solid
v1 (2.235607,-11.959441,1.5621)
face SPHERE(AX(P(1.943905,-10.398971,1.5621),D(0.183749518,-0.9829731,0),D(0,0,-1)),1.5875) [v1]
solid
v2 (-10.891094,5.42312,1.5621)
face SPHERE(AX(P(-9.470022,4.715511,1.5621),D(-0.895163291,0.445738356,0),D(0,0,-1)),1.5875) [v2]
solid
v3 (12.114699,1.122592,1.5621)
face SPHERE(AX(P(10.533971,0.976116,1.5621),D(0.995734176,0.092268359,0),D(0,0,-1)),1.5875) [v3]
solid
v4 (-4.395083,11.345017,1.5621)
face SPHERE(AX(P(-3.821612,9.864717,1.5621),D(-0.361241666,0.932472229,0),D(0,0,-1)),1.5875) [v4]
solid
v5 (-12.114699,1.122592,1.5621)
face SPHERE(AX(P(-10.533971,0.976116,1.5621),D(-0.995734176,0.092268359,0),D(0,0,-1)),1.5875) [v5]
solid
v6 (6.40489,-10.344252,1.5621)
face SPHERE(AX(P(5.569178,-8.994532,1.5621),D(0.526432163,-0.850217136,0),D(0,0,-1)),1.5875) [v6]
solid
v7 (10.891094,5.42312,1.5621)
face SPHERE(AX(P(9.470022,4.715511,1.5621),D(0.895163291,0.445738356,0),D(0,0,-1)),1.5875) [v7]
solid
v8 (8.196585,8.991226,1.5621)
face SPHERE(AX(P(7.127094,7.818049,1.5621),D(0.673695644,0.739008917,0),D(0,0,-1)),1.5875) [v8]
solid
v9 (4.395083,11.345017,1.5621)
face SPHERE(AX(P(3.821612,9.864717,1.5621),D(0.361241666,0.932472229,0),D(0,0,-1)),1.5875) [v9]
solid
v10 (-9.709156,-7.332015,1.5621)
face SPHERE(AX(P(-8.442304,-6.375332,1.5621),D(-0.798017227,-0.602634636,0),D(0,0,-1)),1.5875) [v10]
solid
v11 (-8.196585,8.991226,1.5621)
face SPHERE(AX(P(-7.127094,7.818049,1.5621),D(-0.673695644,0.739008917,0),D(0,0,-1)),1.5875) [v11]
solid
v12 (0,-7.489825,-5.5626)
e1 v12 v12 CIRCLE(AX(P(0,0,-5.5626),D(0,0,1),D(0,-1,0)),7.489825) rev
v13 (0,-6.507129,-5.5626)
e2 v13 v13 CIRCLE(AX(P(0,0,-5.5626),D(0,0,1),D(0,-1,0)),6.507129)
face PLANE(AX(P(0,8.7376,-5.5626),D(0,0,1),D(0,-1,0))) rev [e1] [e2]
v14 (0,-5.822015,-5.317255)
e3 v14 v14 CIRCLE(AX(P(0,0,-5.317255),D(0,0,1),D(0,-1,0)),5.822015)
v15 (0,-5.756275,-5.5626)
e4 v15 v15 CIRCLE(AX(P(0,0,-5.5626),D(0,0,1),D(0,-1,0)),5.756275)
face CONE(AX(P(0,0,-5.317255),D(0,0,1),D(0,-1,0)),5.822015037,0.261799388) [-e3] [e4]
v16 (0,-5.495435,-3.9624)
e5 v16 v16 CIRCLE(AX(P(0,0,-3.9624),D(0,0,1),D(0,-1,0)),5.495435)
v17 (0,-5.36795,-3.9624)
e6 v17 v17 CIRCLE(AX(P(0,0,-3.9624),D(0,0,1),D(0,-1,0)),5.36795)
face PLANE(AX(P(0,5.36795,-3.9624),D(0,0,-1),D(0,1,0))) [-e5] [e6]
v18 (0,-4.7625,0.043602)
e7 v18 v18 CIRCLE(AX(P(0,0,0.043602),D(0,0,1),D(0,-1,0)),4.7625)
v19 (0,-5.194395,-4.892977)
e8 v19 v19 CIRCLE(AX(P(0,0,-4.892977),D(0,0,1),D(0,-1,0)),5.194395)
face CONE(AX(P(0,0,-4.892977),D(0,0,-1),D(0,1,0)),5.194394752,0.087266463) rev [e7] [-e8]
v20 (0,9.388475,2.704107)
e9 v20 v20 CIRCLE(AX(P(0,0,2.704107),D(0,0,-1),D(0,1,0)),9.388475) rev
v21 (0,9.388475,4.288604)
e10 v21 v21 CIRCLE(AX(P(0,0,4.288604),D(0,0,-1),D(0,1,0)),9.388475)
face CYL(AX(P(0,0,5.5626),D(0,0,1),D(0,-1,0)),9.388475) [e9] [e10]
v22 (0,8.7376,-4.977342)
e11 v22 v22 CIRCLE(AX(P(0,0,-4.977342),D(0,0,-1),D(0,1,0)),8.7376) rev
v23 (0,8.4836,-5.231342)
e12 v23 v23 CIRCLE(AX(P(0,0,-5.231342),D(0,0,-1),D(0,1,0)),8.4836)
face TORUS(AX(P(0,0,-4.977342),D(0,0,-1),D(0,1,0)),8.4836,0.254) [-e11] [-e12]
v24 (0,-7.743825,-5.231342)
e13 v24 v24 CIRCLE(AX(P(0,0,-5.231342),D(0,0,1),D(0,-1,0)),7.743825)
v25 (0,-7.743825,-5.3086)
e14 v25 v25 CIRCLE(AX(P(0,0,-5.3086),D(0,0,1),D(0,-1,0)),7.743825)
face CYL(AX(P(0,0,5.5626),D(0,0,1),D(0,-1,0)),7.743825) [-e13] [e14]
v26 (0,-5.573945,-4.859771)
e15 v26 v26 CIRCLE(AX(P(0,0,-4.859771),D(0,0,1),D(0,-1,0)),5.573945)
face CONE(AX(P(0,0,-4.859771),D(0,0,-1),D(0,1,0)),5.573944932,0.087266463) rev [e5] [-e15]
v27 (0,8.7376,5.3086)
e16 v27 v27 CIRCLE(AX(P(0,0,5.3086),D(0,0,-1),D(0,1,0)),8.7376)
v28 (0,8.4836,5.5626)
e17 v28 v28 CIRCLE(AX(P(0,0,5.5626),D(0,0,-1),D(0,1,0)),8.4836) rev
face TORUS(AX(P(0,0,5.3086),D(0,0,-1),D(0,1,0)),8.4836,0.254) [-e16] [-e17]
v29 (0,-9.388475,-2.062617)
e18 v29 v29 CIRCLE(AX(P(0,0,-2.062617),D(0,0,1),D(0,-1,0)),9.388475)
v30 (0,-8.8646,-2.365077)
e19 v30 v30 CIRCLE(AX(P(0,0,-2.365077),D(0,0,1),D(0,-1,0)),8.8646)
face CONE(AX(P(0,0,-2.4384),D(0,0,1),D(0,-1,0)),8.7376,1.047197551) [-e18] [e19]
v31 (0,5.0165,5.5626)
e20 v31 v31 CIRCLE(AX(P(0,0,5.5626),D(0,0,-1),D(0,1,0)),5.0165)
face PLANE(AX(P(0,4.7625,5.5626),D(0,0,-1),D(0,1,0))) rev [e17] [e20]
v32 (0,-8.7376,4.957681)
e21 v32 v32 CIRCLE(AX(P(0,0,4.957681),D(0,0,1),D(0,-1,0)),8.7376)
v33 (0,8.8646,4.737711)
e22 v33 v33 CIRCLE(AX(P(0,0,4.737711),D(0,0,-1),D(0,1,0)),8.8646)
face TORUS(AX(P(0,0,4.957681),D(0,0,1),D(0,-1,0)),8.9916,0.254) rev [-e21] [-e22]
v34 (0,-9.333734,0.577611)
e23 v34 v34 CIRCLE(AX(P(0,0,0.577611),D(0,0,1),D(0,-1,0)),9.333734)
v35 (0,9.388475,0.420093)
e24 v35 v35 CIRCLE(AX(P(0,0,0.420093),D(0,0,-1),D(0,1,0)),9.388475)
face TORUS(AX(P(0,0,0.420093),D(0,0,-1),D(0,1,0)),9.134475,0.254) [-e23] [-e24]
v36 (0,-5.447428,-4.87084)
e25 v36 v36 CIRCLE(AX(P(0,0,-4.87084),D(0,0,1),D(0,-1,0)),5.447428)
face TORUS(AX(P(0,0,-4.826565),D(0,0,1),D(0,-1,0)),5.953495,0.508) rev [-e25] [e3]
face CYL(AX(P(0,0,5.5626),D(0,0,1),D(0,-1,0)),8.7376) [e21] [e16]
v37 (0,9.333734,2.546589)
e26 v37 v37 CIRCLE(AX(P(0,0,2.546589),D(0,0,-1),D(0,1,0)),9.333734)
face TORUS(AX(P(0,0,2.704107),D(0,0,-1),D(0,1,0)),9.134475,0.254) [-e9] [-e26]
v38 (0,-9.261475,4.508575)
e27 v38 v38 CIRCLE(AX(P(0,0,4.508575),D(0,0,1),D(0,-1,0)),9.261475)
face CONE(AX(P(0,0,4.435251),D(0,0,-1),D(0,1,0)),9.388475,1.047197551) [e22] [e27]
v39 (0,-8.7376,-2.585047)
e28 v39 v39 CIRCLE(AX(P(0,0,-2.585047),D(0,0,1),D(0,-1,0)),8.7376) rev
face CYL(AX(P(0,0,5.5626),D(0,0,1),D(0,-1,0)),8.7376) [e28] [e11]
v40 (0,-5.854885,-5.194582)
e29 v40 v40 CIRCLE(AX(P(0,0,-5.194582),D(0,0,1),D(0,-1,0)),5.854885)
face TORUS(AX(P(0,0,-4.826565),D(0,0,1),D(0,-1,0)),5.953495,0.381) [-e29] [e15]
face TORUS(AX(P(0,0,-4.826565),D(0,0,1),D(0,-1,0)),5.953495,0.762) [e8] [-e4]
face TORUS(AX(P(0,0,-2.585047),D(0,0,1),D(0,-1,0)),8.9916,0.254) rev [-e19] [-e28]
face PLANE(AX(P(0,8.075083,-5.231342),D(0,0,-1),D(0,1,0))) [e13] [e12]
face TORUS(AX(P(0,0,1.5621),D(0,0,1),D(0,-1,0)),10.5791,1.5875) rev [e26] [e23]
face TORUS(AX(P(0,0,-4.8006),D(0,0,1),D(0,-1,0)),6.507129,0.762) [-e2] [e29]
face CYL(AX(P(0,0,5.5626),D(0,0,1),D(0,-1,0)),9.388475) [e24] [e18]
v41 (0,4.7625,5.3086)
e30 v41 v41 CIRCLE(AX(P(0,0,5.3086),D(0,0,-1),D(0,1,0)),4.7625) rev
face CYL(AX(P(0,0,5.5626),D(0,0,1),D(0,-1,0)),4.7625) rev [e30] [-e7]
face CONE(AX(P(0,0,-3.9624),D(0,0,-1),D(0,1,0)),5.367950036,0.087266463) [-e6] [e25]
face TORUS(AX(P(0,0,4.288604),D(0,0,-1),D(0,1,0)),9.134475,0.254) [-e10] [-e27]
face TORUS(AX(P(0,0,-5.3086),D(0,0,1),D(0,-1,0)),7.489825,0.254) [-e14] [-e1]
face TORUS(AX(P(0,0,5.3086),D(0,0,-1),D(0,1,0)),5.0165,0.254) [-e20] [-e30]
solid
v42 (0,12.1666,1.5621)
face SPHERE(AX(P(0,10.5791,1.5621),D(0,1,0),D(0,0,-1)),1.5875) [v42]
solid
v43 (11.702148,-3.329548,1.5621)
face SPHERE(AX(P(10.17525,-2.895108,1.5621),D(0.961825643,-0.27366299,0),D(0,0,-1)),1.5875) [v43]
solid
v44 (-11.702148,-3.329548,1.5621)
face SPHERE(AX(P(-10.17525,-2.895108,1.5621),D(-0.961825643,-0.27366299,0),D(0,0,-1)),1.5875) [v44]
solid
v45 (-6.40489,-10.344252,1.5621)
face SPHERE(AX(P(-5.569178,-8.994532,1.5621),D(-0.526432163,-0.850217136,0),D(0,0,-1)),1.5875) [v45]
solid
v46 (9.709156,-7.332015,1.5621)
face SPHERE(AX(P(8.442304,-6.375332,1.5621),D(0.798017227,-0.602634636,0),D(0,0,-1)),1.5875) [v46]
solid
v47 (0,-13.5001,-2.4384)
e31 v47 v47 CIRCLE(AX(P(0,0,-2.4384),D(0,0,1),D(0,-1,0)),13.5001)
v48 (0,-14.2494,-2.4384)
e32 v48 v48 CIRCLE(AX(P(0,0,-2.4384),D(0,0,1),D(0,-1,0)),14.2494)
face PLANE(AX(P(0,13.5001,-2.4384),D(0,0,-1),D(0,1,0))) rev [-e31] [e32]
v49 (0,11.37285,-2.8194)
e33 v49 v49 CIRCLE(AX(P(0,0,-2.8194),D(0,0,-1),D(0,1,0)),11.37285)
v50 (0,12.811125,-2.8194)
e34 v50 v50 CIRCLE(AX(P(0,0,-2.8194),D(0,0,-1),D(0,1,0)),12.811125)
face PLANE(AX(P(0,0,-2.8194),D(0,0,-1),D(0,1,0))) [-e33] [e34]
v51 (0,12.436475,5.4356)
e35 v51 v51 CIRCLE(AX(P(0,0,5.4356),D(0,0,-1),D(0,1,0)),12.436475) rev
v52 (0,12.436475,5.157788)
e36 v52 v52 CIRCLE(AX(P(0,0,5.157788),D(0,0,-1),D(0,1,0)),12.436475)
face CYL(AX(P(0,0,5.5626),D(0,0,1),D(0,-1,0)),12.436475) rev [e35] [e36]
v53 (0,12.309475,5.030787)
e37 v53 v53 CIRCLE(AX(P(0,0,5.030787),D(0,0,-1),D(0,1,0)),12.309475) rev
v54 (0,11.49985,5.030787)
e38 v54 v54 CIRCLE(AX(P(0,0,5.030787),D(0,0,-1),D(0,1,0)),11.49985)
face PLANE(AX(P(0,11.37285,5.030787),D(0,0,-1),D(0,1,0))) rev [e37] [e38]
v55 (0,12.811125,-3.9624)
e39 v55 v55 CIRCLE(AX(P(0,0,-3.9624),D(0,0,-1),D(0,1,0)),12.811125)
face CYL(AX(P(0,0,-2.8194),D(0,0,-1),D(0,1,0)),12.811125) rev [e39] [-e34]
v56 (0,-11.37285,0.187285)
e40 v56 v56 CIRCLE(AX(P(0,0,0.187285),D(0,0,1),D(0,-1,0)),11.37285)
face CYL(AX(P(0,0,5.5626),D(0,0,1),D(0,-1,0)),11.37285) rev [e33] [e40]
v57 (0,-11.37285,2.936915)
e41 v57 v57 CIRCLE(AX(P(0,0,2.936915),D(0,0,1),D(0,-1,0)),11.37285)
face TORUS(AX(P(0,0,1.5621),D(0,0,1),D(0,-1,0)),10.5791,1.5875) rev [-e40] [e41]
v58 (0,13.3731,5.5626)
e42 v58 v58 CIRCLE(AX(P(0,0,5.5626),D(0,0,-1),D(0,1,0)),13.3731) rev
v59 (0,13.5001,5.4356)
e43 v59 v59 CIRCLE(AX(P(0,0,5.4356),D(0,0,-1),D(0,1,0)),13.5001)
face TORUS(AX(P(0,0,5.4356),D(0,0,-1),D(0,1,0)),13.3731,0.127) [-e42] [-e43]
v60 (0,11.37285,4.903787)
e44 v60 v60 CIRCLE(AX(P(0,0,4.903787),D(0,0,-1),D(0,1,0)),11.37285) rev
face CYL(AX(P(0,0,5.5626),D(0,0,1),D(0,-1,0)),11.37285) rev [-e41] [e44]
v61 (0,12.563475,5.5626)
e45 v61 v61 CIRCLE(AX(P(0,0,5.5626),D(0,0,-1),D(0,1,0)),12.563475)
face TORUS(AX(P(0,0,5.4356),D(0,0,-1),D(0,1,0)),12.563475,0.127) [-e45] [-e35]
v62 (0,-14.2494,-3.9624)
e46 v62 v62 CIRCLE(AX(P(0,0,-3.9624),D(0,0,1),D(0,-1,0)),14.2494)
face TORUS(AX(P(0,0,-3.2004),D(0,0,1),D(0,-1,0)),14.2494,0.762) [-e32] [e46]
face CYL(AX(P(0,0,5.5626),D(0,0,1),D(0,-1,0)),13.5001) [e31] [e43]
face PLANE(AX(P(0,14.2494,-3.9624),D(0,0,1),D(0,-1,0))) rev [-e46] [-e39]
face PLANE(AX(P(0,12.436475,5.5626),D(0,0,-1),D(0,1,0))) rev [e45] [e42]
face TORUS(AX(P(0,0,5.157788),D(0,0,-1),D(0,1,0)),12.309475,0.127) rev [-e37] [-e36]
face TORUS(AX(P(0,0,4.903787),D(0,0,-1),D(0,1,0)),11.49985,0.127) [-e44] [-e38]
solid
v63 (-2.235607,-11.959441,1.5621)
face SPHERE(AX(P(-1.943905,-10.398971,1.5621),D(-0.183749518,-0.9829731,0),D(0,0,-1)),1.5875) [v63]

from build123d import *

# Parameters (mm, degrees)
FILLET4_R          = 0.762
CIRPATTERN3_COUNT  = 17
FILLET2_R          = 0.127
FILLET3_R          = 0.127
FILLET5_R          = 0.254
SKETCH12_R         = 12.811125
SKETCH12_R_2       = 11.37285
CUT_EXTRUDE1_DEPTH = 1.143


with BuildPart() as part:
    # Sketch2 → Revolve1 (revolve)
    with BuildSketch(Plane(origin=(0, 0, 0), x_dir=(0, 0, -1), z_dir=(1, 0, 0)), mode=Mode.PRIVATE) as revolve1_sk:
        with BuildLine():
            Line((2.4384, 13.5001), (-5.5626, 13.5001))
            Line((-5.5626, 13.5001), (-5.5626, 12.436475))
            Line((-5.5626, 12.436475), (-5.0307875, 12.436475))
            Line((-5.0307875, 12.436475), (-5.0307875, 11.37285))
            Line((-5.0307875, 11.37285), (-2.936915329, 11.37285))
            ThreePointArc((-2.936915329, 11.37285), (-1.5621, 12.1666), (-0.187284671, 11.37285))
            Line((-0.187284671, 11.37285), (3.9624, 11.37285))
            Line((3.9624, 11.37285), (3.9624, 14.2494))
            ThreePointArc((3.9624, 14.2494), (3.2004, 15.0114), (2.4384, 14.2494))
            Line((2.4384, 14.2494), (2.4384, 13.5001))
        make_face()
    revolve(revolve1_sk.sketch.rotate(Axis((0, 0, 5.5626), (0, 0, -1)), 180), axis=Axis((0, 0, 5.5626), (0, 0, -1)))

    # Fillet2
    fillet2_edges = [part.edges().sort_by_distance(p)[0] for p in [
        (0, 11.37285, 5.0307875),
        (0, 12.436475, 5.0307875),
    ]]
    fillet(fillet2_edges, radius=FILLET2_R)

    # Fillet3
    fillet3_edges = [part.edges().sort_by_distance(p)[0] for p in [
        (0, 12.436475, 5.5626),
        (0, 13.5001, 5.5626),
    ]]
    fillet(fillet3_edges, radius=FILLET3_R)

    # Sketch12 → Cut-Extrude1 (cut)
    with BuildSketch(Plane(origin=(0, 0, -3.9624), x_dir=(-1, 0, 0), z_dir=(0, 0, -1))):
        with Locations(Location((0, 0, 0), (0, 0, 90))):
            Circle(SKETCH12_R)
        with Locations(Location((0, 0, 0), (0, 0, 270))):
            Circle(SKETCH12_R_2, mode=Mode.SUBTRACT)
    extrude(amount=-CUT_EXTRUDE1_DEPTH, mode=Mode.SUBTRACT)


with BuildPart() as body_2:
    # Sketch3 → Revolve2 (revolve)
    with BuildSketch(Plane(origin=(0, 0, 0), x_dir=(0, 0, -1), z_dir=(1, 0, 0)), mode=Mode.PRIVATE) as revolve2_sk:
        with BuildLine():
            Line((-5.5626, 8.7376), (-4.811034287, 8.7376))
            Line((-4.811034287, 8.7376), (-4.435251431, 9.388475))
            Line((-4.435251431, 9.388475), (-2.612132552, 9.388475))
            ThreePointArc((-2.612132552, 9.388475), (-1.5621, 8.9916), (-0.512067448, 9.388475))
            Line((-0.512067448, 9.388475), (2.062617144, 9.388475))
            Line((2.062617144, 9.388475), (2.4384, 8.7376))
            Line((2.4384, 8.7376), (5.5626, 8.7376))
            Line((5.5626, 8.7376), (5.5626, 4.7625))
            Line((5.5626, 4.7625), (-5.5626, 4.7625))
            Line((-5.5626, 4.7625), (-5.5626, 8.7376))
        make_face()
    revolve(revolve2_sk.sketch.rotate(Axis((0, 0, 5.5626), (0, 0, -1)), 180), axis=Axis((0, 0, 5.5626), (0, 0, -1)))

    # Sketch5 → Cut-Revolve2 (revolve, cut)
    with BuildSketch(Plane(origin=(0, 0, 0), x_dir=(0, 0, -1), z_dir=(1, 0, 0)), mode=Mode.PRIVATE) as cut_revolve2_sk:
        with BuildLine():
            Line((5.5626, 5.756275), (5.5626, 4.7625))
            Line((5.5626, 4.7625), (-0.043602413, 4.7625))
            Line((-0.043602413, 4.7625), (4.892977196, 5.194394752))
            ThreePointArc((4.892977196, 5.194394752), (5.316368679, 5.369769247), (5.5626, 5.756275))
        make_face()
    revolve(cut_revolve2_sk.sketch.rotate(Axis((0, 0, 5.5626), (0, 0, -1)), 180), axis=Axis((0, 0, 5.5626), (0, 0, -1)), mode=Mode.SUBTRACT)

    # Sketch6 → Cut-Revolve3 (revolve, cut)
    with BuildSketch(Plane(origin=(0, 0, 0), x_dir=(0, 0, -1), z_dir=(1, 0, 0)), mode=Mode.PRIVATE) as cut_revolve3_sk:
        with BuildLine():
            Line((5.31725484, 5.822015037), (5.5626, 5.756275))
            Line((5.5626, 5.756275), (5.5626, 5.854885056))
            Line((5.5626, 5.854885056), (5.19458226, 5.854885056))
            ThreePointArc((5.19458226, 5.854885056), (5.0714666, 5.66163218), (4.859770858, 5.573944932))
            Line((4.859770858, 5.573944932), (3.9624, 5.495435155))
            Line((3.9624, 5.495435155), (3.9624, 5.367950036))
            Line((3.9624, 5.367950036), (4.870839638, 5.447428206))
            ThreePointArc((4.870839638, 5.447428206), (5.153100626, 5.564344535), (5.31725484, 5.822015037))
        make_face()
    revolve(cut_revolve3_sk.sketch.rotate(Axis((0, 0, 5.5626), (0, 0, -1)), 180), axis=Axis((0, 0, 5.5626), (0, 0, -1)), mode=Mode.SUBTRACT)

    # Fillet4
    # the kernel refuses this fillet: 0.762 mm, written as the material it takes off along each edge
    with BuildSketch(Plane(origin=(0, 0, -5.5626), x_dir=(0, -1, 0), z_dir=(1, 0, 0))) as fillet4_piece_1:
        with BuildLine():
            CenterArc((6.507128859, -0.762), FILLET4_R, 90, 58.866285833)
            Line((5.854885056, -0.36801774), (5.84184018, -0.360138095))
            ThreePointArc((5.84184018, -0.360138095), (5.839645056, -0.18400887), (5.839645056, 0))
            Line((5.839645056, 0), (5.854885056, 0.01524))
            Line((5.854885056, 0.01524), (6.507128859, 0.01524))
            Line((6.507128859, 0.01524), (6.507128859, 0))
        make_face()
    revolve(axis=Axis((0, 0, -5.5626), (0, 0, -1)), mode=Mode.SUBTRACT)

    # Sketch7 → Cut-Revolve4 (revolve, cut)
    with BuildSketch(Plane(origin=(0, 0, 0), x_dir=(0, 0, -1), z_dir=(1, 0, 0)), mode=Mode.PRIVATE) as cut_revolve4_sk:
        Polygon((5.5626, 7.743825), (5.5626, 8.7376), (5.231341667, 8.7376), (5.231341667, 8.406341667), (5.231341667, 8.075083333), (5.231341667, 7.743825), align=None)
    revolve(cut_revolve4_sk.sketch.rotate(Axis((0, 0, 5.5626), (0, 0, -1)), 180), axis=Axis((0, 0, 5.5626), (0, 0, -1)), mode=Mode.SUBTRACT)

    # Fillet5
    fillet5_edges = [body_2.edges().sort_by_distance(p)[0] for p in [
        (0, 4.7625, 5.5626),
        (0, 7.743825, -5.5626),
        (0, 8.7376, -5.231341667),
        (0, 8.7376, 5.5626),
        (0, 8.7376, 4.811034287),
        (0, 9.388475, 4.435251431),
        (0, 9.388475, 2.612132552),
        (0, 9.388475, 0.512067448),
        (0, 8.7376, -2.4384),
    ]]
    fillet(fillet5_edges, radius=FILLET5_R)


with BuildPart() as body_3:
    # Sketch11 → Revolve3 (revolve)
    with BuildSketch(Plane(origin=(0, 0, 0), x_dir=(0, 0, -1), z_dir=(1, 0, 0))):
        with BuildLine():
            Line((-1.5621, 12.1666), (-1.5621, 8.9916))
            ThreePointArc((-1.5621, 8.9916), (0.0254, 10.5791), (-1.5621, 12.1666))
        make_face()
    revolve(axis=Axis((0, 12.1666, 1.5621), (0, -1, 0)))


with BuildPart() as cirpattern3_1:
    # CirPattern3: pattern copy
    add(body_3.part.rotate(Axis((0, 0, 0), (0, 0, 1)), 1 * 360 / CIRPATTERN3_COUNT))


with BuildPart() as cirpattern3_2:
    # CirPattern3: pattern copy
    add(body_3.part.rotate(Axis((0, 0, 0), (0, 0, 1)), 2 * 360 / CIRPATTERN3_COUNT))


with BuildPart() as cirpattern3_3:
    # CirPattern3: pattern copy
    add(body_3.part.rotate(Axis((0, 0, 0), (0, 0, 1)), 3 * 360 / CIRPATTERN3_COUNT))


with BuildPart() as cirpattern3_4:
    # CirPattern3: pattern copy
    add(body_3.part.rotate(Axis((0, 0, 0), (0, 0, 1)), 4 * 360 / CIRPATTERN3_COUNT))


with BuildPart() as cirpattern3_5:
    # CirPattern3: pattern copy
    add(body_3.part.rotate(Axis((0, 0, 0), (0, 0, 1)), 5 * 360 / CIRPATTERN3_COUNT))


with BuildPart() as cirpattern3_6:
    # CirPattern3: pattern copy
    add(body_3.part.rotate(Axis((0, 0, 0), (0, 0, 1)), 6 * 360 / CIRPATTERN3_COUNT))


with BuildPart() as cirpattern3_7:
    # CirPattern3: pattern copy
    add(body_3.part.rotate(Axis((0, 0, 0), (0, 0, 1)), 7 * 360 / CIRPATTERN3_COUNT))


with BuildPart() as cirpattern3_8:
    # CirPattern3: pattern copy
    add(body_3.part.rotate(Axis((0, 0, 0), (0, 0, 1)), 8 * 360 / CIRPATTERN3_COUNT))


with BuildPart() as cirpattern3_9:
    # CirPattern3: pattern copy
    add(body_3.part.rotate(Axis((0, 0, 0), (0, 0, 1)), 9 * 360 / CIRPATTERN3_COUNT))


with BuildPart() as cirpattern3_10:
    # CirPattern3: pattern copy
    add(body_3.part.rotate(Axis((0, 0, 0), (0, 0, 1)), 10 * 360 / CIRPATTERN3_COUNT))


with BuildPart() as cirpattern3_11:
    # CirPattern3: pattern copy
    add(body_3.part.rotate(Axis((0, 0, 0), (0, 0, 1)), 11 * 360 / CIRPATTERN3_COUNT))


with BuildPart() as cirpattern3_12:
    # CirPattern3: pattern copy
    add(body_3.part.rotate(Axis((0, 0, 0), (0, 0, 1)), 12 * 360 / CIRPATTERN3_COUNT))


with BuildPart() as cirpattern3_13:
    # CirPattern3: pattern copy
    add(body_3.part.rotate(Axis((0, 0, 0), (0, 0, 1)), 13 * 360 / CIRPATTERN3_COUNT))


with BuildPart() as cirpattern3_14:
    # CirPattern3: pattern copy
    add(body_3.part.rotate(Axis((0, 0, 0), (0, 0, 1)), 14 * 360 / CIRPATTERN3_COUNT))


with BuildPart() as cirpattern3_15:
    # CirPattern3: pattern copy
    add(body_3.part.rotate(Axis((0, 0, 0), (0, 0, 1)), 15 * 360 / CIRPATTERN3_COUNT))


with BuildPart() as cirpattern3_16:
    # CirPattern3: pattern copy
    add(body_3.part.rotate(Axis((0, 0, 0), (0, 0, 1)), 16 * 360 / CIRPATTERN3_COUNT))


solid = Compound([part.part, body_2.part, body_3.part, cirpattern3_1.part, cirpattern3_2.part, cirpattern3_3.part, cirpattern3_4.part, cirpattern3_5.part, cirpattern3_6.part, cirpattern3_7.part, cirpattern3_8.part, cirpattern3_9.part, cirpattern3_10.part, cirpattern3_11.part, cirpattern3_12.part, cirpattern3_13.part, cirpattern3_14.part, cirpattern3_15.part, cirpattern3_16.part])
